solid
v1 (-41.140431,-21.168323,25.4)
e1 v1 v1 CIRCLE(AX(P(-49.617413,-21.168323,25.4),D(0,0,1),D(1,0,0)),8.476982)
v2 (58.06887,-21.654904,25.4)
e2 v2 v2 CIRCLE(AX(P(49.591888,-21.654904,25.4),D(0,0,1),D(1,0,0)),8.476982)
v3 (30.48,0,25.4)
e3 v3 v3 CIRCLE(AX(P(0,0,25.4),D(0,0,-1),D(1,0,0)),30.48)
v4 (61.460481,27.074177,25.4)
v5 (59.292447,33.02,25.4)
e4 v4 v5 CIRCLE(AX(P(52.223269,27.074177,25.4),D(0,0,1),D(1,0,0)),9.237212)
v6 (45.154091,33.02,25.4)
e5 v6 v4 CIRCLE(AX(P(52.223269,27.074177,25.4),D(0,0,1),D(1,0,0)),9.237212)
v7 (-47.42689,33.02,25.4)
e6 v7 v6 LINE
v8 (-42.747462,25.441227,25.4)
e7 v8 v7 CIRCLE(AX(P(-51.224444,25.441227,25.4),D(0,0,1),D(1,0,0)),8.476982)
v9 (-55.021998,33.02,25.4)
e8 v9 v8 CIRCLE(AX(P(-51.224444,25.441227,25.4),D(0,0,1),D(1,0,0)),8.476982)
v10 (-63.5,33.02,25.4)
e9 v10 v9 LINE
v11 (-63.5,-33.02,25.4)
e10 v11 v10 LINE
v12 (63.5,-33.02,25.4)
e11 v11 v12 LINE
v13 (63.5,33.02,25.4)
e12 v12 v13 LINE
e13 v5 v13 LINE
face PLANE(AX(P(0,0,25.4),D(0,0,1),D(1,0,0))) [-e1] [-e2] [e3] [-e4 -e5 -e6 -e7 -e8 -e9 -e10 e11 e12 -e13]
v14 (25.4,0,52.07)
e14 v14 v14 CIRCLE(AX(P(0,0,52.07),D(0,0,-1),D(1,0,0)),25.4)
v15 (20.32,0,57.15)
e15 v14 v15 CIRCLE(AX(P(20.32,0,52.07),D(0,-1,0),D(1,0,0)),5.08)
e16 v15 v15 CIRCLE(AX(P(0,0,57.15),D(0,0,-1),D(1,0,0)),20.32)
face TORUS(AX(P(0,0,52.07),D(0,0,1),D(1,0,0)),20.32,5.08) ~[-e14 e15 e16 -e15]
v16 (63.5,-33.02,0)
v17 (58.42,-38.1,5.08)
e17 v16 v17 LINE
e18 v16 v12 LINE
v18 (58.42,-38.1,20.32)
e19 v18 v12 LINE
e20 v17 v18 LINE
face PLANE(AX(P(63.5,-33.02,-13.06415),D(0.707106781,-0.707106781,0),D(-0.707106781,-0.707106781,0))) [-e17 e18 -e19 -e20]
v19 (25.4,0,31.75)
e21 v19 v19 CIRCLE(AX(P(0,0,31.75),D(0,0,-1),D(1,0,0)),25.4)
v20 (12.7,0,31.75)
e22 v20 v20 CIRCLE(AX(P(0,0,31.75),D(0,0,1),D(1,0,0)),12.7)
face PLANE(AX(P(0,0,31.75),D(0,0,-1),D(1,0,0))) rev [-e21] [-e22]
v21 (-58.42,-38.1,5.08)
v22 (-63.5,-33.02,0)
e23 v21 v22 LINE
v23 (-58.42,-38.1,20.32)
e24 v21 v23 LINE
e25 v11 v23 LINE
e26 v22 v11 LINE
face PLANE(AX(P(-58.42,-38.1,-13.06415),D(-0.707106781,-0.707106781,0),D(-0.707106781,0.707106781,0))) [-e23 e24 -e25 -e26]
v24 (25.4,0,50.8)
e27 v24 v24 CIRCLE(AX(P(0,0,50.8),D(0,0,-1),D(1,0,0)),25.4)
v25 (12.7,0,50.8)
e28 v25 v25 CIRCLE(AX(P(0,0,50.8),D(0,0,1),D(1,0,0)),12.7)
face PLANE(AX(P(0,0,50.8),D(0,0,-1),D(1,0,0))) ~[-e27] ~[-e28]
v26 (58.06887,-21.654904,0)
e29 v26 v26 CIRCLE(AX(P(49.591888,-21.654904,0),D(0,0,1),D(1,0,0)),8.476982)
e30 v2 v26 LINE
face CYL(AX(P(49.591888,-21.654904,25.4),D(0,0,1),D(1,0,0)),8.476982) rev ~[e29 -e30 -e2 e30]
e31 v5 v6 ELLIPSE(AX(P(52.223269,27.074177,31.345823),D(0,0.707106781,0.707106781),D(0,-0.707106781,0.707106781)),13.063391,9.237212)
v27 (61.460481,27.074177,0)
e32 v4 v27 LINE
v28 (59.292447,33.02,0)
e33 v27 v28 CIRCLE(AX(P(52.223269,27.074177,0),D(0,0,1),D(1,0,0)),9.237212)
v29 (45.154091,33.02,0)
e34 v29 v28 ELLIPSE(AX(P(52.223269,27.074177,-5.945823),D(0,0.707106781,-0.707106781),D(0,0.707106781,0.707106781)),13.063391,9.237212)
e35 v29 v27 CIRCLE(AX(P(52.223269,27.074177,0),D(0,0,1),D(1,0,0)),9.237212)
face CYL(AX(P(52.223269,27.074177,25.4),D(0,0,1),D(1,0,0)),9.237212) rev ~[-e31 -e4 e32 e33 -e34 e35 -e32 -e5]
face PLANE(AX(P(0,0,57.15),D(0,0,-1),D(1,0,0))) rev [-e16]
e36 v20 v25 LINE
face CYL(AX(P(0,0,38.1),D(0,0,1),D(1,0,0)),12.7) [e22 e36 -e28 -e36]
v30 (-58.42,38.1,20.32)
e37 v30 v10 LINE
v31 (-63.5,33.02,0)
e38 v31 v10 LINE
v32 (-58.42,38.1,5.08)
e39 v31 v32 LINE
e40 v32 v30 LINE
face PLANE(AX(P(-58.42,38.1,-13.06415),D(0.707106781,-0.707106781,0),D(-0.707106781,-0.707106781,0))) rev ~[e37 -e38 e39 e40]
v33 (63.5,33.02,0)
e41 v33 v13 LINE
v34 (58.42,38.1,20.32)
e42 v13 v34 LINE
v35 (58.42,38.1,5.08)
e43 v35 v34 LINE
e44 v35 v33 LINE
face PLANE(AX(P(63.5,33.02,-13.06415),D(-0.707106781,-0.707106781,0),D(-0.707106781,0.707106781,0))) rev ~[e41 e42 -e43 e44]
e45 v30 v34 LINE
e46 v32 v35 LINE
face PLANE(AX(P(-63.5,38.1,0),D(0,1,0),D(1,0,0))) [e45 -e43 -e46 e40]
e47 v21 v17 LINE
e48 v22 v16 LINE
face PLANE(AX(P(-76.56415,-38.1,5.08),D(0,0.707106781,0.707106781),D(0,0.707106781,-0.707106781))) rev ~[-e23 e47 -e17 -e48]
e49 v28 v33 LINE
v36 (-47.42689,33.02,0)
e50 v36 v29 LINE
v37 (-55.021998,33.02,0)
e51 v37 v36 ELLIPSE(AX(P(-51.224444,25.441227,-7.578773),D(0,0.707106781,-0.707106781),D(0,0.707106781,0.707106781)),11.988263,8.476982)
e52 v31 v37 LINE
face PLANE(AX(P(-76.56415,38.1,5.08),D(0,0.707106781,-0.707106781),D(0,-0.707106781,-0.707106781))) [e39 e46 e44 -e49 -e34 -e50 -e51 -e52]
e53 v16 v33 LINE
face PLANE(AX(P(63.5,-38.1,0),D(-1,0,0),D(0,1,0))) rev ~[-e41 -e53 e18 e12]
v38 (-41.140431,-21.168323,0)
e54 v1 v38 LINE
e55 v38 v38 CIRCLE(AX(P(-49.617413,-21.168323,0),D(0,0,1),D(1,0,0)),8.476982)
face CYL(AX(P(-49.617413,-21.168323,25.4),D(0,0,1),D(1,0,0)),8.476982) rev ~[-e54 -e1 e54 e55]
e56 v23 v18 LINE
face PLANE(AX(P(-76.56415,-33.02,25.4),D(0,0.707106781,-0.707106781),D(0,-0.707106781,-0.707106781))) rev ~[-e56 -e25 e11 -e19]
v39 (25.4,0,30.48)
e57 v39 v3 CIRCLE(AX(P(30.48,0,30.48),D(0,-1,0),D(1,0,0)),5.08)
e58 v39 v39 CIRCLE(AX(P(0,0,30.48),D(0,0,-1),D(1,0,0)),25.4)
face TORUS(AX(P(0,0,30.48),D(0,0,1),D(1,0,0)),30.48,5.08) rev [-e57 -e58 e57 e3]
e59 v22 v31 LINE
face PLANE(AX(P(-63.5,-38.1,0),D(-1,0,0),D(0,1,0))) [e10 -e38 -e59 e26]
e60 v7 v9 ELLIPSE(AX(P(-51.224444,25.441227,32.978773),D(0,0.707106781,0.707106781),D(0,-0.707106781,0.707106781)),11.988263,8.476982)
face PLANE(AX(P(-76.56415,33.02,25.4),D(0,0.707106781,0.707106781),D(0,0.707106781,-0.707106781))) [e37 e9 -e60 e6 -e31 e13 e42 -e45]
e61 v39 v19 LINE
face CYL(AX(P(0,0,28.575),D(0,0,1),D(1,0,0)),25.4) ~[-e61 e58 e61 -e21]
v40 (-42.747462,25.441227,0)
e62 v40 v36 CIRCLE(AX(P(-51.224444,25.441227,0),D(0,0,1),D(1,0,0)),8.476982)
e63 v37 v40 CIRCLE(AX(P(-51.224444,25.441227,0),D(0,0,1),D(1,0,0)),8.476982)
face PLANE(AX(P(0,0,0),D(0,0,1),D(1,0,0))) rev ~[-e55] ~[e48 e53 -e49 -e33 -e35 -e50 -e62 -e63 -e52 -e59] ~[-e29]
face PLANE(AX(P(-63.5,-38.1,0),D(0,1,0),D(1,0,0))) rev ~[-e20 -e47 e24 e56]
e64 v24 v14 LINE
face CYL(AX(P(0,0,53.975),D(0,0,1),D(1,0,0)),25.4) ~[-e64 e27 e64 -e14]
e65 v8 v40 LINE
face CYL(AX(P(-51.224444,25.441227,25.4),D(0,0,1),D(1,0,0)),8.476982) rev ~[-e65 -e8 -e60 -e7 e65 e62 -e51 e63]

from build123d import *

# Parameters (mm, degrees)
F0_W         = 127
F0_H         = 76.2
F1_DEPTH     = 25.4
F2_R         = 8.4769821521
F2_R_2       = 9.2372123091
F3_DEPTH     = 25.401
F4_W         = 12.7
F4_H         = 25.4
F6_W         = 25.4
F6_H         = 6.35
F8_W         = 25.4
F8_H         = 6.35
F10_R        = 5.08
F11_T1_DEPTH = 51.5282991577
F11_T3_DEPTH = 153.1282991577


# Not quite as in the source:
# - a fillet or chamfer that OpenCascade refuses, or shapes differently, is made with other operations: its cross-section is extruded or revolved along the edge and cut away or added


with BuildPart() as f1:
    # F0 (on Top) → F1 (new body)
    with BuildSketch(Plane.XY):
        Rectangle(F0_W, F0_H)
    extrude(amount=F1_DEPTH)

    # F2 (on face) → F3 (cut, through all)
    with BuildSketch(Plane.XY.offset(25.4)):
        with Locations((-51.2244440438, 25.4412265494)):
            Circle(F2_R)
        with Locations((-49.6174134314, -21.1683232337)):
            Circle(F2_R)
        with Locations((52.2232688963, 27.0741768181)):
            Circle(F2_R_2)
        with Locations((49.5918877423, -21.6549038887)):
            Circle(F2_R)
    extrude(amount=-F3_DEPTH, mode=Mode.SUBTRACT)

    # F4 (on Front) → F5 (revolve)
    with BuildSketch(Plane.XZ):
        with Locations((6.35, 38.1)):
            Rectangle(F4_W, F4_H)
    revolve(axis=Axis((0, 0, 38.1), (0, 0, 1)))

    # F6 (on Front) → F7 (revolve)
    with BuildSketch(Plane.XZ):
        with Locations((12.7, 53.975)):
            Rectangle(F6_W, F6_H)
    revolve(axis=Axis((0, 0, 53.975), (0, 0, -1)))

    # F8 (on Front) → F9 (revolve)
    with BuildSketch(Plane.XZ):
        with Locations((12.7, 28.575)):
            Rectangle(F8_W, F8_H)
    revolve(axis=Axis((0, 0, 28.575), (0, 0, -1)))

    # F10
    f10_edges = [f1.edges().sort_by_distance(p)[0] for p in [
        (-25.4, 0, 57.15),
        (-25.4, 0, 25.4),
    ]]
    fillet(f10_edges, radius=F10_R)

    # F11: chamfer of 5.08 on 8 edges, made by hand

    # F11_s2 → F11_t1 (cut)
    with BuildSketch(Plane.XY.offset(-13.0641495789)):
        Polygon((-58.42, -38.1), (-63.5, -33.02), (-63.5, -38.1), align=None)
        Polygon((63.5, -33.02), (58.42, -38.1), (63.5, -38.1), align=None)
        Polygon((63.5, 33.02), (58.42, 38.1), (63.5, 38.1), align=None)
        Polygon((-58.42, 38.1), (-63.5, 33.02), (-63.5, 38.1), align=None)
    extrude(amount=F11_T1_DEPTH, mode=Mode.SUBTRACT)

    # F11_s4 → F11_t3 (cut)
    with BuildSketch(Plane.YZ.offset(-76.5641495789)):
        Polygon((-38.1, 5.08), (-33.02, 0), (-38.1, 0), align=None)
        Polygon((-33.02, 25.4), (-38.1, 20.32), (-38.1, 25.4), align=None)
        Polygon((38.1, 5.08), (33.02, 0), (38.1, 0), align=None)
        Polygon((33.02, 25.4), (38.1, 20.32), (38.1, 25.4), align=None)
    extrude(amount=F11_T3_DEPTH, mode=Mode.SUBTRACT)


solid = f1.part
